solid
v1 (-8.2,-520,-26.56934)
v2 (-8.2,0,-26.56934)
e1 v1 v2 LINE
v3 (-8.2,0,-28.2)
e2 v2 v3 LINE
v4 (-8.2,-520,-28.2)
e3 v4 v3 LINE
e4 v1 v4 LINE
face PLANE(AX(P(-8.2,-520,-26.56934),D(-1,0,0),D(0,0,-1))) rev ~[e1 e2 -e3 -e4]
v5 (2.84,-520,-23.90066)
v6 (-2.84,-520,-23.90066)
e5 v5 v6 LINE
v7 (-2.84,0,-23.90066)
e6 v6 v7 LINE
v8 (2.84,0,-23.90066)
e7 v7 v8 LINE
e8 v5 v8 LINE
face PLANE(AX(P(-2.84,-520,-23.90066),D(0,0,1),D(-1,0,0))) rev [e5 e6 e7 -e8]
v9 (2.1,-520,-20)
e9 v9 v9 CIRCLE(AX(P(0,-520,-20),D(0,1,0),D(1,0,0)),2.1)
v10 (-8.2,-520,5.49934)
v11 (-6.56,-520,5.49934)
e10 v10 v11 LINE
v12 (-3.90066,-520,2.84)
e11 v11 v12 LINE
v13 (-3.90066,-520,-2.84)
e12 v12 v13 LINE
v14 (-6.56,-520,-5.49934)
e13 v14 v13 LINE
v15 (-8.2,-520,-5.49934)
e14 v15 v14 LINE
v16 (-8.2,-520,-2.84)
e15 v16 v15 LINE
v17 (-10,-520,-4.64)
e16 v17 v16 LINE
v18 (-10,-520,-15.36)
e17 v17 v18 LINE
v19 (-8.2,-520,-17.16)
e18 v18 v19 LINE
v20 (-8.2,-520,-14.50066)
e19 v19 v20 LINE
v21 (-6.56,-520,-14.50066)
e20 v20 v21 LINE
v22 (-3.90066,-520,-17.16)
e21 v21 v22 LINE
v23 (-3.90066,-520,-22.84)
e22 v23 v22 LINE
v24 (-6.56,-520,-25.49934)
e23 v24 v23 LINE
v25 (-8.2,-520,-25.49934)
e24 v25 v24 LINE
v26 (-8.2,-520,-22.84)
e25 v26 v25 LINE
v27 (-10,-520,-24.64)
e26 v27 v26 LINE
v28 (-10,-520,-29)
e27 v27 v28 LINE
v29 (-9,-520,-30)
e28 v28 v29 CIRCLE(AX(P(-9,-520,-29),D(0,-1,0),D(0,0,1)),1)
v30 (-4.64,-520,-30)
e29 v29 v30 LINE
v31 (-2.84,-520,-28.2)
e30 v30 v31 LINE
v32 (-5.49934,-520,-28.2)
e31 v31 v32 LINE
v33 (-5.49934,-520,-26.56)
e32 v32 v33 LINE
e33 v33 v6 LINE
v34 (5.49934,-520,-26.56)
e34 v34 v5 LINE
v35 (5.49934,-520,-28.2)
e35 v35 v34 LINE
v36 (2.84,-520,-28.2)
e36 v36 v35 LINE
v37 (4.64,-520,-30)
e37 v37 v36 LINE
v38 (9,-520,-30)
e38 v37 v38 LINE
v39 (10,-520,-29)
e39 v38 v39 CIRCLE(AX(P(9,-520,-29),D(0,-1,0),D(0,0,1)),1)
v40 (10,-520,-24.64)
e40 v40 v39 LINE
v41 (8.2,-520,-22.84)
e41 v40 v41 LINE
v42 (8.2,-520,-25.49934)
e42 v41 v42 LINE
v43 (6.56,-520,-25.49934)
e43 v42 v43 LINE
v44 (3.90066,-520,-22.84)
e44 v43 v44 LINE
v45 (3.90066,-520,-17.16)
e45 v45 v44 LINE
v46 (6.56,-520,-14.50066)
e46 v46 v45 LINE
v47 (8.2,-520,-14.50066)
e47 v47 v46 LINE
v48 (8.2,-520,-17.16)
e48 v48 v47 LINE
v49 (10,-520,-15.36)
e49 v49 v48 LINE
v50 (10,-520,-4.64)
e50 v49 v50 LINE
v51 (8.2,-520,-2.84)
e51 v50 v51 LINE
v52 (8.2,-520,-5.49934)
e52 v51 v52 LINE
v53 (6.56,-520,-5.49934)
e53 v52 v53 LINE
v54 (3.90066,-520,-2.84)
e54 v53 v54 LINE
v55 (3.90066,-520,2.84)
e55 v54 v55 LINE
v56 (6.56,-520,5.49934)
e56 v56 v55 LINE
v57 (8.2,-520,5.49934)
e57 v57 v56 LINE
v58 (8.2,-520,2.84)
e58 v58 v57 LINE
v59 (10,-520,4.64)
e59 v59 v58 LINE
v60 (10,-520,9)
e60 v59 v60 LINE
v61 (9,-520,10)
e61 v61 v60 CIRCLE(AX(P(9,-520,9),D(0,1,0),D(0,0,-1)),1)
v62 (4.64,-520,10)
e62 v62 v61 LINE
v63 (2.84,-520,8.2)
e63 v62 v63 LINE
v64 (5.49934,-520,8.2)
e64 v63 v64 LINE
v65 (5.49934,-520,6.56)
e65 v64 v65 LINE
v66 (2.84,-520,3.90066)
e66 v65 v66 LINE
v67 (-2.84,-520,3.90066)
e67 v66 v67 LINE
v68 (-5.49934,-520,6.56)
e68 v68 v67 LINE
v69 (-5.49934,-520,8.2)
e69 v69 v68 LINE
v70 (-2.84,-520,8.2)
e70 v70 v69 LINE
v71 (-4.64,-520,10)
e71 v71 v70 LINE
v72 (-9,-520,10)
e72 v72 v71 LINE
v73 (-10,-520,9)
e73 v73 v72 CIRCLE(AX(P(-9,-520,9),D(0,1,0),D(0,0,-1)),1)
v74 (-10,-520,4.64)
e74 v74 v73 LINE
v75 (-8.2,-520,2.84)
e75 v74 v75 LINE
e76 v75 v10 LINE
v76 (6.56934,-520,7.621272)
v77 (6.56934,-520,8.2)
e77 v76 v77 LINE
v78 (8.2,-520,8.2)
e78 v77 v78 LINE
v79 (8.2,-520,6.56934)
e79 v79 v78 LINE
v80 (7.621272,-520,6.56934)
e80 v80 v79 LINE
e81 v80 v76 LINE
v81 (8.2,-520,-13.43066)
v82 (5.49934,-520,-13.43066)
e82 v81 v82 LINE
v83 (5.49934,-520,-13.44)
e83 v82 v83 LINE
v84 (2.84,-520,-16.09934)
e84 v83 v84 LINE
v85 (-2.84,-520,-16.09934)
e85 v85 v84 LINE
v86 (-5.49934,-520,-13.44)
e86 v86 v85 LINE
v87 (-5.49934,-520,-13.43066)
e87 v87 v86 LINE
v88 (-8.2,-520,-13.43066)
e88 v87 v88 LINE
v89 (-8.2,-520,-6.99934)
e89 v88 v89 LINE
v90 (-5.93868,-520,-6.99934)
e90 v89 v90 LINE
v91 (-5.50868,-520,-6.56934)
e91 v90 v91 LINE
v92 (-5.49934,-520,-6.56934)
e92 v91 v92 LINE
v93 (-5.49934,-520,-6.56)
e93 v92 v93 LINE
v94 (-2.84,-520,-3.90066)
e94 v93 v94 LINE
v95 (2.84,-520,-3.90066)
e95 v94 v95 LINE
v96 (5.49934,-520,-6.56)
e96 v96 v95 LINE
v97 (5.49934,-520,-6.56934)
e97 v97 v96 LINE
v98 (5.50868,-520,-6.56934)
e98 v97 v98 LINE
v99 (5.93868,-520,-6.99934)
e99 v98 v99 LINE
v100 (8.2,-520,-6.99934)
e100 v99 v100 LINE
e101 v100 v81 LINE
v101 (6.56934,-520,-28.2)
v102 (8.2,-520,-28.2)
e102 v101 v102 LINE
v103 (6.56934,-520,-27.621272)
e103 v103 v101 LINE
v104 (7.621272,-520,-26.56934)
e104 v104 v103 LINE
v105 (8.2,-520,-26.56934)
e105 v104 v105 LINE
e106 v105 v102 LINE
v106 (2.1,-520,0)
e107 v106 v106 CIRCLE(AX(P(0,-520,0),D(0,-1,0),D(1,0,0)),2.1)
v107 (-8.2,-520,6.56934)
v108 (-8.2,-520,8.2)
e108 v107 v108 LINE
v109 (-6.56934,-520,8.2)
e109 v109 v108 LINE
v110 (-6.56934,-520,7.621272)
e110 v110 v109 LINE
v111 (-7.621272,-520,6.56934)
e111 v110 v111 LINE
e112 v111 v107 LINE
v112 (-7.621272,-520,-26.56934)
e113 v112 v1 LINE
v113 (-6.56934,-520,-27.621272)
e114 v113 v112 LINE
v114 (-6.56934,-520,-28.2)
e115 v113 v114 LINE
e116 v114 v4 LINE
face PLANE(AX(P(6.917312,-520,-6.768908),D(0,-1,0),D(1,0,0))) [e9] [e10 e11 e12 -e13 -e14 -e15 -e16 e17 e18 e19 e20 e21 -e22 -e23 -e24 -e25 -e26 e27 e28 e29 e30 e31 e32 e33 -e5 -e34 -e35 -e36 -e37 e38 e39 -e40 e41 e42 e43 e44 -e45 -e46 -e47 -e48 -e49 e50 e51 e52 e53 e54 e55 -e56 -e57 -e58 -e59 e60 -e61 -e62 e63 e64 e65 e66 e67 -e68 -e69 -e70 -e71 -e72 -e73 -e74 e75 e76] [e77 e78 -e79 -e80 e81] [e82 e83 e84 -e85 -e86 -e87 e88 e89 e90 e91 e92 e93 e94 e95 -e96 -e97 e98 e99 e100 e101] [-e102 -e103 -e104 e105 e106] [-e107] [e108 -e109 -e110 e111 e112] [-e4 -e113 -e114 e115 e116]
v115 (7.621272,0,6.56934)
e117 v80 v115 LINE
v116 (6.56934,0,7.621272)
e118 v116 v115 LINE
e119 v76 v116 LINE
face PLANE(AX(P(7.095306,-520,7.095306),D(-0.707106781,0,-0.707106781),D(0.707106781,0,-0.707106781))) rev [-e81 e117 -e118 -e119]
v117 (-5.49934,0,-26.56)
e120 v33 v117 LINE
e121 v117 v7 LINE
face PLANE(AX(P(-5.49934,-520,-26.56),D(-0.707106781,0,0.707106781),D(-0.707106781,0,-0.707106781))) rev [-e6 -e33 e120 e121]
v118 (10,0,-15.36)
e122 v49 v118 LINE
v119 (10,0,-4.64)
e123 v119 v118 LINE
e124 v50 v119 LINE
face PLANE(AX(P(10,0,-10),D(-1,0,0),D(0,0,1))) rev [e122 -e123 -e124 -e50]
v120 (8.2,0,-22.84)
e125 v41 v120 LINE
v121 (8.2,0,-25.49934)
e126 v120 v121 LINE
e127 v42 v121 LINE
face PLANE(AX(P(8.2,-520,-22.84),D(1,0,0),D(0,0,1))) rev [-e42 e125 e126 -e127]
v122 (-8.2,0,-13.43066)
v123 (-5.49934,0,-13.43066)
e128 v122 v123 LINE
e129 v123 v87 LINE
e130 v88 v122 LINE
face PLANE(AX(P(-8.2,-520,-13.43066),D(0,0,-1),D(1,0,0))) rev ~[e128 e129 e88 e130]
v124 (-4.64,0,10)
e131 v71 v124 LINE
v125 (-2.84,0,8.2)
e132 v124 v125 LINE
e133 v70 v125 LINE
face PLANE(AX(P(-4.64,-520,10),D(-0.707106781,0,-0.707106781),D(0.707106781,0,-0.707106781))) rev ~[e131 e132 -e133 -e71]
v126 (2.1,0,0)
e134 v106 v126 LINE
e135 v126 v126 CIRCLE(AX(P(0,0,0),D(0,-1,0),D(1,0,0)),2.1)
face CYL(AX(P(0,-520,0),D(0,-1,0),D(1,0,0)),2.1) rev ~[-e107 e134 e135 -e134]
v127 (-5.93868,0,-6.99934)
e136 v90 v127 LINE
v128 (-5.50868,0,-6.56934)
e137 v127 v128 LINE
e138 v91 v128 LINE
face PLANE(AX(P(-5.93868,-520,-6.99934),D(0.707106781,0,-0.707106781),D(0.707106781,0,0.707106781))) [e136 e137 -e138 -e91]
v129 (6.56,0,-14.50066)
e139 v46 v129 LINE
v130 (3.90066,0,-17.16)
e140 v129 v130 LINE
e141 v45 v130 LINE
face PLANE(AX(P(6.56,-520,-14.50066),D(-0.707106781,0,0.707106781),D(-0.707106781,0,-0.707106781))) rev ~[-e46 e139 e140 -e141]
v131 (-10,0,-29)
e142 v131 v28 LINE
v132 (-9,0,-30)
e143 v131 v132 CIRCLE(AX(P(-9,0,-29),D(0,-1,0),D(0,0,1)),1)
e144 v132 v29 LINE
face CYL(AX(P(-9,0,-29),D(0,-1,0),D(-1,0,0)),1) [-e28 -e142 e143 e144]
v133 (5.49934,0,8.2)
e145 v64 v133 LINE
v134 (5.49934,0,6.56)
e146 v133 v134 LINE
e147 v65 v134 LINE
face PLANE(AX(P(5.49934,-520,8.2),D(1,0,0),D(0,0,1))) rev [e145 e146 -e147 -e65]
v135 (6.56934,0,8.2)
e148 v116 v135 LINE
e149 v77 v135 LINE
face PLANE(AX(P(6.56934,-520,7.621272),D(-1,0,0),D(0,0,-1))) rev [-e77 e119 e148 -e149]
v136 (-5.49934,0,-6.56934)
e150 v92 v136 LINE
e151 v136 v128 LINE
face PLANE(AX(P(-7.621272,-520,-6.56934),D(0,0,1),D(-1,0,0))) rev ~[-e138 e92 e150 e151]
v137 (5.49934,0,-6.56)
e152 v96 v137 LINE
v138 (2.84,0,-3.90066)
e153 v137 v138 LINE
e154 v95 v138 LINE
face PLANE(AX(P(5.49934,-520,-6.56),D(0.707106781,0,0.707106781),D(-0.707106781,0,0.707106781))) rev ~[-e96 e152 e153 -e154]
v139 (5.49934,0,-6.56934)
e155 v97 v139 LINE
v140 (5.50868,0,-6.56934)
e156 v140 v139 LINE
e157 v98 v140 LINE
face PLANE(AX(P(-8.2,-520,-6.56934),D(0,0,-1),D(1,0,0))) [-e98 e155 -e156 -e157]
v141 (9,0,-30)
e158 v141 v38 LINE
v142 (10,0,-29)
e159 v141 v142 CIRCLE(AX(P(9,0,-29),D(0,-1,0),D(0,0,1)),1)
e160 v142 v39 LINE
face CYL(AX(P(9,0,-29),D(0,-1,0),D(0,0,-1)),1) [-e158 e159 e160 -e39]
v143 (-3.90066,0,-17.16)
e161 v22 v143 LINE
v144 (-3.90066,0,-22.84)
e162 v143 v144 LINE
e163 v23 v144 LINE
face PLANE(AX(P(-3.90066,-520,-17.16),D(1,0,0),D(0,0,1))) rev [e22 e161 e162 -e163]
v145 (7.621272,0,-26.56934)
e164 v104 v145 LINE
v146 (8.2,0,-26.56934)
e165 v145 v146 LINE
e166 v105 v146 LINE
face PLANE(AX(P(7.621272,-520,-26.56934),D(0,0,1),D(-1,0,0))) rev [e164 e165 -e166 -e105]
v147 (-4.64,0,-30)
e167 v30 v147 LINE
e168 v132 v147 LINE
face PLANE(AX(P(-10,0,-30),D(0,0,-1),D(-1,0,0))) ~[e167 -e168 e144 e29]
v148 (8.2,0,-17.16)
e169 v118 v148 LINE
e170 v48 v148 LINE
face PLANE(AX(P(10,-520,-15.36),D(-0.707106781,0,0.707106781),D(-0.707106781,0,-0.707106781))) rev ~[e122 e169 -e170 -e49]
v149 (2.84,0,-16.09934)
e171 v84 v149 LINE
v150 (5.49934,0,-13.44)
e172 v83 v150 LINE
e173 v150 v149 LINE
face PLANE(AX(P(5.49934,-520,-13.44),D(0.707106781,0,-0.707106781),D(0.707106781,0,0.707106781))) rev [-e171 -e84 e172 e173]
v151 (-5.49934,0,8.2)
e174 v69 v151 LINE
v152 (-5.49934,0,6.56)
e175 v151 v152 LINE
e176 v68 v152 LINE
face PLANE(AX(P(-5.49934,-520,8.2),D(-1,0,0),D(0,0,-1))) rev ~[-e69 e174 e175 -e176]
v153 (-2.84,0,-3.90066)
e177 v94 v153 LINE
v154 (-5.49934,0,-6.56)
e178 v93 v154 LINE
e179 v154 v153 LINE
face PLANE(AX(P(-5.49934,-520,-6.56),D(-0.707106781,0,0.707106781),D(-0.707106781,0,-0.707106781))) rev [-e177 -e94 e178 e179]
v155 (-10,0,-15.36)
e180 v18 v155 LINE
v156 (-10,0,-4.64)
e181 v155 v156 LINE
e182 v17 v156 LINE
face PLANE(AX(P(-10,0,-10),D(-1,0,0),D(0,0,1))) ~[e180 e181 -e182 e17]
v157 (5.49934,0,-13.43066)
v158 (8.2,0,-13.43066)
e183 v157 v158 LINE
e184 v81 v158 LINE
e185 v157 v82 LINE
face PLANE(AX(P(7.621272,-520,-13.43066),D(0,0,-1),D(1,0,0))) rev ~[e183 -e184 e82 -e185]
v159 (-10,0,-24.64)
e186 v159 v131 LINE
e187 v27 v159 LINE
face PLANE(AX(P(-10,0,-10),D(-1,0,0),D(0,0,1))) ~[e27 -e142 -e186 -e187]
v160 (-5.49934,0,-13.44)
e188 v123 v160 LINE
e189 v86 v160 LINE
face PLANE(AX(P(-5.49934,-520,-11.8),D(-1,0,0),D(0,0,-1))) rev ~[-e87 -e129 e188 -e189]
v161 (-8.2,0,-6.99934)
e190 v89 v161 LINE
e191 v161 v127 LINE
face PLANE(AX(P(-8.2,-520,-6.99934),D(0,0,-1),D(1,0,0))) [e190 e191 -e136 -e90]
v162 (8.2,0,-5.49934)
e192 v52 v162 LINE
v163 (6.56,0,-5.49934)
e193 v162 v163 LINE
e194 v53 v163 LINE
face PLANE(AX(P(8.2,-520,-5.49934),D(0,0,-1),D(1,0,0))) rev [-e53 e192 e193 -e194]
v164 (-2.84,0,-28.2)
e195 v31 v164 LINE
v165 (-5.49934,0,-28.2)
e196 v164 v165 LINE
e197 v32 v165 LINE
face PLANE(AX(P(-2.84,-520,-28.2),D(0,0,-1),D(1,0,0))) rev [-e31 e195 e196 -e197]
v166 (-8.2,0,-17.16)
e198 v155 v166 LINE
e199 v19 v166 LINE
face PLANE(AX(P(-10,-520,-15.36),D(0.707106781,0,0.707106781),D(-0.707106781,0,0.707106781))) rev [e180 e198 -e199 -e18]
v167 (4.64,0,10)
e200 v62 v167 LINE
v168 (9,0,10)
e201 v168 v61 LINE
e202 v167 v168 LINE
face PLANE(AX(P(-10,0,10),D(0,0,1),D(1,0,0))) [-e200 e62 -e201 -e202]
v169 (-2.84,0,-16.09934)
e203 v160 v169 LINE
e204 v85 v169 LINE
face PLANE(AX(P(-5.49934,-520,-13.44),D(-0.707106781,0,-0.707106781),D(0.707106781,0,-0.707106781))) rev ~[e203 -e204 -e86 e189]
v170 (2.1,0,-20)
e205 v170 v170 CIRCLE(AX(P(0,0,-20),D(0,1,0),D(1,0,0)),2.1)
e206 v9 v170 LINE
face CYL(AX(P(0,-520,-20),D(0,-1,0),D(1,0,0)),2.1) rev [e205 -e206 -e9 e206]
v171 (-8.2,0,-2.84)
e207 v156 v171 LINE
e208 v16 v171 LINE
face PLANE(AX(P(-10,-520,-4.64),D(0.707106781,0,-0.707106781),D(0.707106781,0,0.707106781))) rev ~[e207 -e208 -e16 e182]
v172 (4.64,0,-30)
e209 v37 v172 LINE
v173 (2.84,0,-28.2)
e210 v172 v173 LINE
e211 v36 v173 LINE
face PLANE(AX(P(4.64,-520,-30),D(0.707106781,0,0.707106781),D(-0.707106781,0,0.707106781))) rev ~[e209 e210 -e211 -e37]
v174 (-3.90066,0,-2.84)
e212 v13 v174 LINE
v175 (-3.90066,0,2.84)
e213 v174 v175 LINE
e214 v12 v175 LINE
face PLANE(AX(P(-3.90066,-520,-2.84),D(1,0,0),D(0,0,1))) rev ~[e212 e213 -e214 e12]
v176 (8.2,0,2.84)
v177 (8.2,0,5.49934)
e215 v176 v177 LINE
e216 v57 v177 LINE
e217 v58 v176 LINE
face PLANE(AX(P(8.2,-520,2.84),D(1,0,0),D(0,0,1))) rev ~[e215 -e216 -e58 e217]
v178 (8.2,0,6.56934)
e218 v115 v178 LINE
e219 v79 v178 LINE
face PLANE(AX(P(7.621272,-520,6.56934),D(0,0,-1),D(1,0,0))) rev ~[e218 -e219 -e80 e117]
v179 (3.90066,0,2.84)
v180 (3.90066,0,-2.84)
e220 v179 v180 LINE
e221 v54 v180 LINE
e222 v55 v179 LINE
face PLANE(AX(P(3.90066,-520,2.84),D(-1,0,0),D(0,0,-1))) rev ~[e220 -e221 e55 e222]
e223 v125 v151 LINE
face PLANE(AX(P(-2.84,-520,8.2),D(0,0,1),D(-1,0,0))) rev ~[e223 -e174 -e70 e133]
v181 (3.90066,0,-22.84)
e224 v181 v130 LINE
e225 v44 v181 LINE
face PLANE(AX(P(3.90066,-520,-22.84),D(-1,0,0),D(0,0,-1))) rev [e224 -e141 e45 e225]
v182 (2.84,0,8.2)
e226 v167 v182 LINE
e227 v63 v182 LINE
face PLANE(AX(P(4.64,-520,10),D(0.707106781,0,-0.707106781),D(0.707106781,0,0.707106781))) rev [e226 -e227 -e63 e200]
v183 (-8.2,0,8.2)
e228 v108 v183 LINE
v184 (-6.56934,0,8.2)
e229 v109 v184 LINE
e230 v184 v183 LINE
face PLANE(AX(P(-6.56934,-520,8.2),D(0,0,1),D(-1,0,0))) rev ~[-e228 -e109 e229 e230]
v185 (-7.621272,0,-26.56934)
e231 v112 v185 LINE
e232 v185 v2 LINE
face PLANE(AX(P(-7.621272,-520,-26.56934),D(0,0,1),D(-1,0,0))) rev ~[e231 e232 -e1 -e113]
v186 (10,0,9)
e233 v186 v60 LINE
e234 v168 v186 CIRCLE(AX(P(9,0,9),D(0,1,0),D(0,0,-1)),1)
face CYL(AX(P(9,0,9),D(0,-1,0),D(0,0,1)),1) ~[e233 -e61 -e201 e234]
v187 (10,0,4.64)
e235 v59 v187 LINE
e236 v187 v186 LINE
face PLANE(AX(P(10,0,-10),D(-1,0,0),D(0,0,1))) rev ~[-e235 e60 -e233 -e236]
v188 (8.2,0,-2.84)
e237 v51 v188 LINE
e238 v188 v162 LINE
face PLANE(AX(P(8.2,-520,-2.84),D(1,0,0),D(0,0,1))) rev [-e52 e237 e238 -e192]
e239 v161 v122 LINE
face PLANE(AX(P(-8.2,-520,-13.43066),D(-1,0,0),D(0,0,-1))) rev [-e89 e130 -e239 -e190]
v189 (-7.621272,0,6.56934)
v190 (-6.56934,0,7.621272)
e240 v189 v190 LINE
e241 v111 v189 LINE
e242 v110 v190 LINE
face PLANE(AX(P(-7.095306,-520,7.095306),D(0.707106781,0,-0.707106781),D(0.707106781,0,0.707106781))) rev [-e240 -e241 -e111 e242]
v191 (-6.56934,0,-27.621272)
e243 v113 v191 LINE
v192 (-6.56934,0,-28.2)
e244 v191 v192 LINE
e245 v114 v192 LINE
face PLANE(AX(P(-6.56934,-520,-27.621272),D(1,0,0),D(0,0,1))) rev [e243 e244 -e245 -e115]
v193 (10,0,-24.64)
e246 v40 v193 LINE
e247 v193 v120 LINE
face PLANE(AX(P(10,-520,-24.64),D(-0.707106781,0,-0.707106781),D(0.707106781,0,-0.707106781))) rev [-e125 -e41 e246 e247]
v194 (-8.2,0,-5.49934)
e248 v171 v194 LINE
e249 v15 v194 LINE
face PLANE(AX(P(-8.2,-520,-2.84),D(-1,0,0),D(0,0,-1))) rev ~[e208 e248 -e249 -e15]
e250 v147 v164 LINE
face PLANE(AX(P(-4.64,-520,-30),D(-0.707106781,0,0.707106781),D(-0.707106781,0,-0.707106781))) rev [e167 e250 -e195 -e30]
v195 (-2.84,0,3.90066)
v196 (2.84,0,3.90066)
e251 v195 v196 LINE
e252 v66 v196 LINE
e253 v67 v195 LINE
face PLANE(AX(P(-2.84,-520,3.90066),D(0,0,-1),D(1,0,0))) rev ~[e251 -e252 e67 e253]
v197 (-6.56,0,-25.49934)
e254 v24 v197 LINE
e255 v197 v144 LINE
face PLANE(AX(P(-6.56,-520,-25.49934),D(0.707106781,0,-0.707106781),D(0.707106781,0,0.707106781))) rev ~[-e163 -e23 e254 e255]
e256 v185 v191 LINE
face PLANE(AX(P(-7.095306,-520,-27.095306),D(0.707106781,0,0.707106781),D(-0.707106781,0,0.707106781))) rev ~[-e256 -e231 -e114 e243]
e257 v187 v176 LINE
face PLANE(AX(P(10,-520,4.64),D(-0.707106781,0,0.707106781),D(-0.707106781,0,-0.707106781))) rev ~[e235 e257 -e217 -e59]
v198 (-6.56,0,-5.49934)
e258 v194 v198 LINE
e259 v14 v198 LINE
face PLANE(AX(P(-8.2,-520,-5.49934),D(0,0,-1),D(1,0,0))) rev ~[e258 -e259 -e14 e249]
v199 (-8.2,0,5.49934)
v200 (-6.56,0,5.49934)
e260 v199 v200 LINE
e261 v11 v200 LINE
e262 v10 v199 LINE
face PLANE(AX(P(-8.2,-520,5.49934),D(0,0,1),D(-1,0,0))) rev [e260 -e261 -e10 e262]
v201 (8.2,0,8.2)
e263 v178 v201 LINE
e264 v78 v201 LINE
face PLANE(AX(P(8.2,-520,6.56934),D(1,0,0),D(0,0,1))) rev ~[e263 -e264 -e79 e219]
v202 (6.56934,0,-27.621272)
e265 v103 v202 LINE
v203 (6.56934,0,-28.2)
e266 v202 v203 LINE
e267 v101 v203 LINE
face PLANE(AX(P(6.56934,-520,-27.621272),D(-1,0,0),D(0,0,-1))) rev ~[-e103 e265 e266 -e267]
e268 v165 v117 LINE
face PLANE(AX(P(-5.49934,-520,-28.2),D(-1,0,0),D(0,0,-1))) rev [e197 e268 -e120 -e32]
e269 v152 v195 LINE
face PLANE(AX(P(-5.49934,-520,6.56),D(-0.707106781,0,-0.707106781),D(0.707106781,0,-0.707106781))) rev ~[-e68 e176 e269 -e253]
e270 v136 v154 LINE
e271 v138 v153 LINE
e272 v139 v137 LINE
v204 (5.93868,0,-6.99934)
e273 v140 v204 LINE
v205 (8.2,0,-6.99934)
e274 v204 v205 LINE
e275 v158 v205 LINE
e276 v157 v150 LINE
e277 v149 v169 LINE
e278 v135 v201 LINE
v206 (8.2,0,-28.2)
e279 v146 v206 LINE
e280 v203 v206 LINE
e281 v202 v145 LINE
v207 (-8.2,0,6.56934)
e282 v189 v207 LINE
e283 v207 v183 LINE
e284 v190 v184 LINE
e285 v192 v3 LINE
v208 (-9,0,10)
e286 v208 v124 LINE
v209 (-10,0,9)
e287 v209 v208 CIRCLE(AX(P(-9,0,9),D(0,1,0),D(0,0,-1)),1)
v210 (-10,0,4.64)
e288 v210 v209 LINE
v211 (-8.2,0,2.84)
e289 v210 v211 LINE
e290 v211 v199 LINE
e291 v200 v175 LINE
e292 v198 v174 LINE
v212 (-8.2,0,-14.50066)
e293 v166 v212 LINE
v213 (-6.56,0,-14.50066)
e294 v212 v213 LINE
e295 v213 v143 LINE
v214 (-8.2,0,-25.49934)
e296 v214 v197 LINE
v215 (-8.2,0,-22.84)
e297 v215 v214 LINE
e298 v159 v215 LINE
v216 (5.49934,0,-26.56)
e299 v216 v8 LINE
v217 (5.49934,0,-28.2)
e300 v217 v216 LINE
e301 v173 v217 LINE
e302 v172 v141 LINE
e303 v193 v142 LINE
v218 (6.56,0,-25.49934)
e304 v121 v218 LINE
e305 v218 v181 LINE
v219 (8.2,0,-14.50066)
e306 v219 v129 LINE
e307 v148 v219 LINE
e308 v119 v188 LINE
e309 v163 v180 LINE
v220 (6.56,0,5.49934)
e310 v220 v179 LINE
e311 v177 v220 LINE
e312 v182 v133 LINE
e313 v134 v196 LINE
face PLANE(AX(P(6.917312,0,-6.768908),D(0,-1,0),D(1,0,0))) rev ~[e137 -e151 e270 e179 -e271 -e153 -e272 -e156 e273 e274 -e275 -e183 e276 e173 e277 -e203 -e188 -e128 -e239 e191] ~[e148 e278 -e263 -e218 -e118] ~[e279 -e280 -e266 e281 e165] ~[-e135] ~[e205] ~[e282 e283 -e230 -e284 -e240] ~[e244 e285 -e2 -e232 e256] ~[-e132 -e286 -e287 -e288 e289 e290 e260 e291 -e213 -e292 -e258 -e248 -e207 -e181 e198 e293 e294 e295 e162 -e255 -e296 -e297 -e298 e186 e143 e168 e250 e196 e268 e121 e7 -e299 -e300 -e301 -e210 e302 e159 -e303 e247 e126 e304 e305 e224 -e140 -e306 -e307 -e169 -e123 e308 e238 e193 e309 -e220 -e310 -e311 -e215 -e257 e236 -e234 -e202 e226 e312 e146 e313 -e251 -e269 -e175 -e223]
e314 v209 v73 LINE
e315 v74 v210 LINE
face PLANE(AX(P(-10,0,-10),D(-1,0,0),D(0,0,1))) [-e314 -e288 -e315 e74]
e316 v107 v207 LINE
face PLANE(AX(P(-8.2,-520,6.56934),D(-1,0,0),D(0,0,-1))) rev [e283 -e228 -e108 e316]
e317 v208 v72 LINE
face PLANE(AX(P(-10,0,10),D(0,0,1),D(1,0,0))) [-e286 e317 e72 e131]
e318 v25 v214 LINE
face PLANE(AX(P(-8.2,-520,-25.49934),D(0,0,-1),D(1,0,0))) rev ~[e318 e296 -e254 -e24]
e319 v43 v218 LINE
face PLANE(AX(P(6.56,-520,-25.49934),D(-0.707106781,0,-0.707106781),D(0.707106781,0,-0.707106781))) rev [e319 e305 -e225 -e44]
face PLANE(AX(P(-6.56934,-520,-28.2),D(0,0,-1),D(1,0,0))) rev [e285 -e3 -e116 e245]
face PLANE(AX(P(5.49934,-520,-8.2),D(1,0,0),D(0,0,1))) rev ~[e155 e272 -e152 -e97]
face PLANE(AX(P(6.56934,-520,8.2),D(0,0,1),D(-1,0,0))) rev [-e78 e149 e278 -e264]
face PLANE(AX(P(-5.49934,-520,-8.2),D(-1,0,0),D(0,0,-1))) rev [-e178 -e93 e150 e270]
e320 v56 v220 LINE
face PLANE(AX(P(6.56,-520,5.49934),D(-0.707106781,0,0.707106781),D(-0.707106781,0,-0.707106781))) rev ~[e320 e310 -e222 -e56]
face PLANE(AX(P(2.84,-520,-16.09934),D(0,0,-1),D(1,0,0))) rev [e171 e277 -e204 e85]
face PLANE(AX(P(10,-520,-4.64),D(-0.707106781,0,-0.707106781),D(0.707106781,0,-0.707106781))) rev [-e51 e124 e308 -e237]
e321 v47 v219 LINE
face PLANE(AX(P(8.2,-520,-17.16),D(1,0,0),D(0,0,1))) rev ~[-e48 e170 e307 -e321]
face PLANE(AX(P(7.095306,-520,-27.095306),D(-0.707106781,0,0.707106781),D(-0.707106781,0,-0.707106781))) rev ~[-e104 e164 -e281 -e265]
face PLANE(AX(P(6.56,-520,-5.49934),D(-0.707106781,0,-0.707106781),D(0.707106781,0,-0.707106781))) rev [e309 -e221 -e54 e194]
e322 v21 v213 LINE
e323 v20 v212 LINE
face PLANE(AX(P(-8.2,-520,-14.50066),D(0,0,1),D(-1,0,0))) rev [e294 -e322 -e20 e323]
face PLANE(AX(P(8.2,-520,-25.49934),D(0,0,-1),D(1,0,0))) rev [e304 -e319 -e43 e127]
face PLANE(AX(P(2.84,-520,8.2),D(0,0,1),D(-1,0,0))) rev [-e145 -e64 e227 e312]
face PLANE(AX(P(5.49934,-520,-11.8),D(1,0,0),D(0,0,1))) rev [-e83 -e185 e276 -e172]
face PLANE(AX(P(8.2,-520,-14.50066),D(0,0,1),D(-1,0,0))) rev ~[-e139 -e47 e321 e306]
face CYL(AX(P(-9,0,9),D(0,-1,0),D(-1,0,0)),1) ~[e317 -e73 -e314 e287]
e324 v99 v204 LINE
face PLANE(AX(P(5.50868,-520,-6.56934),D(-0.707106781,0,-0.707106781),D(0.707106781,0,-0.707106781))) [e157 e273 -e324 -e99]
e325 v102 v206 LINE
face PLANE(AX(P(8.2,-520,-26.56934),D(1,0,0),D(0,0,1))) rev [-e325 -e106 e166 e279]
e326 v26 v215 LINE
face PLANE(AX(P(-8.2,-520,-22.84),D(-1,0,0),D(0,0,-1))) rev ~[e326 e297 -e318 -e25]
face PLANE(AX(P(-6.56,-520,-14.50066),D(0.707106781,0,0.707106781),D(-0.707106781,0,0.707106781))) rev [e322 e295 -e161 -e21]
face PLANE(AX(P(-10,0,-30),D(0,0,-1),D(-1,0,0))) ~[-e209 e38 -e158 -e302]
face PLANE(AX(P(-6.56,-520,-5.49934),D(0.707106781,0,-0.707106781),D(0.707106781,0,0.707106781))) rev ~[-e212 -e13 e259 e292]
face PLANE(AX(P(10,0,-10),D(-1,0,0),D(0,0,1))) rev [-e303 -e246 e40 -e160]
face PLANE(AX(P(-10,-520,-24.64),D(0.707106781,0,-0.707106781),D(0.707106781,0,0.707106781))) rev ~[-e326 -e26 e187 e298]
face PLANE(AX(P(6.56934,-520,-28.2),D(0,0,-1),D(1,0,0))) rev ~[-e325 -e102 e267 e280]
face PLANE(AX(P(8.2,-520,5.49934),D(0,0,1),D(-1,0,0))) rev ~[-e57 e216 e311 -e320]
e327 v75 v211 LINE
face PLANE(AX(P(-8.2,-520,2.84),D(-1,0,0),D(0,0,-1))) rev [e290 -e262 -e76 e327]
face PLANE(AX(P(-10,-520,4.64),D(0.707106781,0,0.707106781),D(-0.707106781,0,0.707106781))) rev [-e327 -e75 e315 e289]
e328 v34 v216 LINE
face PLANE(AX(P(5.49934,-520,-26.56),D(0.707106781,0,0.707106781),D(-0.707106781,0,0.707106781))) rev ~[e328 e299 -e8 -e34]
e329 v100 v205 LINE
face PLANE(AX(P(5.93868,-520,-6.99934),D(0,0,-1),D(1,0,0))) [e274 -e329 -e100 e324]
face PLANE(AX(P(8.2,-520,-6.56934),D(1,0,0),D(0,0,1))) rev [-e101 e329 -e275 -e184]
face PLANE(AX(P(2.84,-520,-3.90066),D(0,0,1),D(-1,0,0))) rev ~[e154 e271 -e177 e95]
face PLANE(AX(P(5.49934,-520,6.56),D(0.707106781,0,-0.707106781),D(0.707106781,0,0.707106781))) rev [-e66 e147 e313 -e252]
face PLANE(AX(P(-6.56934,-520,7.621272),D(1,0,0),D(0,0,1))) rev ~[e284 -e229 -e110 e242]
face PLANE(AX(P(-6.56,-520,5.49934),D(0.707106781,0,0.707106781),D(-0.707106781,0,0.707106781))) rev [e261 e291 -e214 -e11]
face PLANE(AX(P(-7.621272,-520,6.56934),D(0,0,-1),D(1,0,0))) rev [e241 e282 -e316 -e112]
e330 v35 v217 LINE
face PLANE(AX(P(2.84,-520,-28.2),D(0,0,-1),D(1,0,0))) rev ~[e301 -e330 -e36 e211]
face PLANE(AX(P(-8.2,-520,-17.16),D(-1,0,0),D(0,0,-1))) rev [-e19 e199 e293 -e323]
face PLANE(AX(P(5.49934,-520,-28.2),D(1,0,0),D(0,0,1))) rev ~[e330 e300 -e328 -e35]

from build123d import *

# Parameters (mm, degrees)
F0_W             = 20
F0_H             = 20
F1_DEPTH         = 520
F2_R             = 2.1
F3_DEPTH         = 520.001
F4_R             = 1
F6_DEPTH         = 520.001
F6_COPIES3_COUNT = 2
F6_COPIES3_ANGLE = 90
F6_COPIES4_COUNT = 2
F6_COPIES4_ANGLE = 270
F6_COPIES6_COUNT = 2
F9_W             = 16.4
F9_H             = 6.8613203436
F10_DEPTH        = 520.001
F12_DEPTH        = 520


# Not quite as in the source:
# - a pattern or mirror of a feature is missing from the dataset's text; its kind, count and spacing are read off the source's solid


with BuildPart() as f1:
    # F0 (on Front) → F1 (new body)
    with BuildSketch(Plane.XZ):
        Rectangle(F0_W, F0_H)
    extrude(amount=F1_DEPTH)

    # F2 (on face) → F3 (cut, through all)
    with BuildSketch(Plane.XZ.offset(520)):
        Circle(F2_R)
    extrude(amount=-F3_DEPTH, mode=Mode.SUBTRACT)

    # F4
    f4_edges = [f1.edges().sort_by_distance(p)[0] for p in [
        (-10, -260, 10),
        (10, -260, 10),
    ]]
    fillet(f4_edges, radius=F4_R)

    # F5 (on face) → F6 (cut, through all)
    with BuildSketch(Plane.XZ.offset(520)):
        Polygon((0, 3.9006601718), (0, 10), (-2.84, 10), (-4.64, 10), (-2.84, 8.2), (-5.4993398282, 8.2), (-5.4993398282, 6.56), (-2.84, 3.9006601718), align=None)
        Polygon((-6.5693398282, 8.2), (-8.2, 8.2), (-7.0953059148, 7.0953059148), (-6.5693398282, 7.6212720014), align=None)
    f6 = extrude(amount=-F6_DEPTH, mode=Mode.SUBTRACT)

    # F6_copies: F6 across plane
    add(f6.mirror(Plane(origin=(0, 0, 0), x_dir=(-0.7071067812, 0, -0.7071067812), z_dir=(0.7071067812, 0, -0.7071067812))), mode=Mode.SUBTRACT)

    # F6_copies1: F6 across plane
    add(f6.mirror(Plane(origin=(0, 0, 0), x_dir=(0.7071067812, 0, -0.7071067812), z_dir=(-0.7071067812, 0, -0.7071067812))), mode=Mode.SUBTRACT)

    # F6_copies2: F6 across plane
    add(f6.mirror(Plane(origin=(0, 0, 0), x_dir=(0, 0, 1), z_dir=(1, 0, 0))), mode=Mode.SUBTRACT)

    # F6_copies3: F6 ×2 about axis
    f6_copies3_axis = Axis((0, 0, 0), (0, 1, 0))
    for i in range(1, F6_COPIES3_COUNT):
        add(f6.rotate(f6_copies3_axis, i * F6_COPIES3_ANGLE / (F6_COPIES3_COUNT - 1)), mode=Mode.SUBTRACT)

    # F6_copies4: F6 ×2 about axis
    f6_copies4_axis = Axis((0, 0, 0), (0, 1, 0))
    for i in range(1, F6_COPIES4_COUNT):
        add(f6.rotate(f6_copies4_axis, i * F6_COPIES4_ANGLE / (F6_COPIES4_COUNT - 1)), mode=Mode.SUBTRACT)

    # F6_copies5: F6 across plane
    add(f6.mirror(Plane(origin=(0, 0, 0), x_dir=(-1, 0, 0), z_dir=(0, 0, -1))), mode=Mode.SUBTRACT)

    # F6_copies6: F6 ×2 about axis
    f6_copies6_axis = Axis((0, 0, 0), (0, 1, 0))
    for i in range(1, F6_COPIES6_COUNT):
        add(f6.rotate(f6_copies6_axis, i * 360 / F6_COPIES6_COUNT), mode=Mode.SUBTRACT)

    # F8: F1 across face


with BuildPart() as f1_1:
    add(f1.part)
    add(f1.part.mirror(Plane(origin=(-7.32, -260, -10), x_dir=(1, 0, 0), z_dir=(0, 0, -1))))

    # F9 (on face) → F10 (cut, through all)
    with BuildSketch(Plane.XZ.offset(520)):
        with Locations((0, -10)):
            Rectangle(F9_W, F9_H)
    extrude(amount=-F10_DEPTH, mode=Mode.SUBTRACT)

    # F11 (on face) → F12 (join, through all)
    with BuildSketch(Plane.XZ.offset(520)):
        with BuildLine():
            ThreePointArc((-9, -10), (-9.7071067812, -9.7071067812), (-10, -9))
            Line((-10, -9), (-10, -11))
            ThreePointArc((-10, -11), (-9.7071067812, -10.2928932188), (-9, -10))
        make_face()
        with BuildLine():
            ThreePointArc((10, -9), (9.7071067812, -9.7071067812), (9, -10))
            ThreePointArc((9, -10), (9.7071067812, -10.2928932188), (10, -11))
            Line((10, -11), (10, -9))
        make_face()
        Polygon((5.9386796564, -6.9993398282), (8.2, -6.9993398282), (8.2, -6.5693398282), (5.5086796564, -6.5693398282), align=None)
        Polygon((-8.2, -6.5693398282), (-8.2, -6.9993398282), (-5.9386796564, -6.9993398282), (-5.5086796564, -6.5693398282), align=None)
    extrude(amount=-F12_DEPTH)


solid = f1_1.part
